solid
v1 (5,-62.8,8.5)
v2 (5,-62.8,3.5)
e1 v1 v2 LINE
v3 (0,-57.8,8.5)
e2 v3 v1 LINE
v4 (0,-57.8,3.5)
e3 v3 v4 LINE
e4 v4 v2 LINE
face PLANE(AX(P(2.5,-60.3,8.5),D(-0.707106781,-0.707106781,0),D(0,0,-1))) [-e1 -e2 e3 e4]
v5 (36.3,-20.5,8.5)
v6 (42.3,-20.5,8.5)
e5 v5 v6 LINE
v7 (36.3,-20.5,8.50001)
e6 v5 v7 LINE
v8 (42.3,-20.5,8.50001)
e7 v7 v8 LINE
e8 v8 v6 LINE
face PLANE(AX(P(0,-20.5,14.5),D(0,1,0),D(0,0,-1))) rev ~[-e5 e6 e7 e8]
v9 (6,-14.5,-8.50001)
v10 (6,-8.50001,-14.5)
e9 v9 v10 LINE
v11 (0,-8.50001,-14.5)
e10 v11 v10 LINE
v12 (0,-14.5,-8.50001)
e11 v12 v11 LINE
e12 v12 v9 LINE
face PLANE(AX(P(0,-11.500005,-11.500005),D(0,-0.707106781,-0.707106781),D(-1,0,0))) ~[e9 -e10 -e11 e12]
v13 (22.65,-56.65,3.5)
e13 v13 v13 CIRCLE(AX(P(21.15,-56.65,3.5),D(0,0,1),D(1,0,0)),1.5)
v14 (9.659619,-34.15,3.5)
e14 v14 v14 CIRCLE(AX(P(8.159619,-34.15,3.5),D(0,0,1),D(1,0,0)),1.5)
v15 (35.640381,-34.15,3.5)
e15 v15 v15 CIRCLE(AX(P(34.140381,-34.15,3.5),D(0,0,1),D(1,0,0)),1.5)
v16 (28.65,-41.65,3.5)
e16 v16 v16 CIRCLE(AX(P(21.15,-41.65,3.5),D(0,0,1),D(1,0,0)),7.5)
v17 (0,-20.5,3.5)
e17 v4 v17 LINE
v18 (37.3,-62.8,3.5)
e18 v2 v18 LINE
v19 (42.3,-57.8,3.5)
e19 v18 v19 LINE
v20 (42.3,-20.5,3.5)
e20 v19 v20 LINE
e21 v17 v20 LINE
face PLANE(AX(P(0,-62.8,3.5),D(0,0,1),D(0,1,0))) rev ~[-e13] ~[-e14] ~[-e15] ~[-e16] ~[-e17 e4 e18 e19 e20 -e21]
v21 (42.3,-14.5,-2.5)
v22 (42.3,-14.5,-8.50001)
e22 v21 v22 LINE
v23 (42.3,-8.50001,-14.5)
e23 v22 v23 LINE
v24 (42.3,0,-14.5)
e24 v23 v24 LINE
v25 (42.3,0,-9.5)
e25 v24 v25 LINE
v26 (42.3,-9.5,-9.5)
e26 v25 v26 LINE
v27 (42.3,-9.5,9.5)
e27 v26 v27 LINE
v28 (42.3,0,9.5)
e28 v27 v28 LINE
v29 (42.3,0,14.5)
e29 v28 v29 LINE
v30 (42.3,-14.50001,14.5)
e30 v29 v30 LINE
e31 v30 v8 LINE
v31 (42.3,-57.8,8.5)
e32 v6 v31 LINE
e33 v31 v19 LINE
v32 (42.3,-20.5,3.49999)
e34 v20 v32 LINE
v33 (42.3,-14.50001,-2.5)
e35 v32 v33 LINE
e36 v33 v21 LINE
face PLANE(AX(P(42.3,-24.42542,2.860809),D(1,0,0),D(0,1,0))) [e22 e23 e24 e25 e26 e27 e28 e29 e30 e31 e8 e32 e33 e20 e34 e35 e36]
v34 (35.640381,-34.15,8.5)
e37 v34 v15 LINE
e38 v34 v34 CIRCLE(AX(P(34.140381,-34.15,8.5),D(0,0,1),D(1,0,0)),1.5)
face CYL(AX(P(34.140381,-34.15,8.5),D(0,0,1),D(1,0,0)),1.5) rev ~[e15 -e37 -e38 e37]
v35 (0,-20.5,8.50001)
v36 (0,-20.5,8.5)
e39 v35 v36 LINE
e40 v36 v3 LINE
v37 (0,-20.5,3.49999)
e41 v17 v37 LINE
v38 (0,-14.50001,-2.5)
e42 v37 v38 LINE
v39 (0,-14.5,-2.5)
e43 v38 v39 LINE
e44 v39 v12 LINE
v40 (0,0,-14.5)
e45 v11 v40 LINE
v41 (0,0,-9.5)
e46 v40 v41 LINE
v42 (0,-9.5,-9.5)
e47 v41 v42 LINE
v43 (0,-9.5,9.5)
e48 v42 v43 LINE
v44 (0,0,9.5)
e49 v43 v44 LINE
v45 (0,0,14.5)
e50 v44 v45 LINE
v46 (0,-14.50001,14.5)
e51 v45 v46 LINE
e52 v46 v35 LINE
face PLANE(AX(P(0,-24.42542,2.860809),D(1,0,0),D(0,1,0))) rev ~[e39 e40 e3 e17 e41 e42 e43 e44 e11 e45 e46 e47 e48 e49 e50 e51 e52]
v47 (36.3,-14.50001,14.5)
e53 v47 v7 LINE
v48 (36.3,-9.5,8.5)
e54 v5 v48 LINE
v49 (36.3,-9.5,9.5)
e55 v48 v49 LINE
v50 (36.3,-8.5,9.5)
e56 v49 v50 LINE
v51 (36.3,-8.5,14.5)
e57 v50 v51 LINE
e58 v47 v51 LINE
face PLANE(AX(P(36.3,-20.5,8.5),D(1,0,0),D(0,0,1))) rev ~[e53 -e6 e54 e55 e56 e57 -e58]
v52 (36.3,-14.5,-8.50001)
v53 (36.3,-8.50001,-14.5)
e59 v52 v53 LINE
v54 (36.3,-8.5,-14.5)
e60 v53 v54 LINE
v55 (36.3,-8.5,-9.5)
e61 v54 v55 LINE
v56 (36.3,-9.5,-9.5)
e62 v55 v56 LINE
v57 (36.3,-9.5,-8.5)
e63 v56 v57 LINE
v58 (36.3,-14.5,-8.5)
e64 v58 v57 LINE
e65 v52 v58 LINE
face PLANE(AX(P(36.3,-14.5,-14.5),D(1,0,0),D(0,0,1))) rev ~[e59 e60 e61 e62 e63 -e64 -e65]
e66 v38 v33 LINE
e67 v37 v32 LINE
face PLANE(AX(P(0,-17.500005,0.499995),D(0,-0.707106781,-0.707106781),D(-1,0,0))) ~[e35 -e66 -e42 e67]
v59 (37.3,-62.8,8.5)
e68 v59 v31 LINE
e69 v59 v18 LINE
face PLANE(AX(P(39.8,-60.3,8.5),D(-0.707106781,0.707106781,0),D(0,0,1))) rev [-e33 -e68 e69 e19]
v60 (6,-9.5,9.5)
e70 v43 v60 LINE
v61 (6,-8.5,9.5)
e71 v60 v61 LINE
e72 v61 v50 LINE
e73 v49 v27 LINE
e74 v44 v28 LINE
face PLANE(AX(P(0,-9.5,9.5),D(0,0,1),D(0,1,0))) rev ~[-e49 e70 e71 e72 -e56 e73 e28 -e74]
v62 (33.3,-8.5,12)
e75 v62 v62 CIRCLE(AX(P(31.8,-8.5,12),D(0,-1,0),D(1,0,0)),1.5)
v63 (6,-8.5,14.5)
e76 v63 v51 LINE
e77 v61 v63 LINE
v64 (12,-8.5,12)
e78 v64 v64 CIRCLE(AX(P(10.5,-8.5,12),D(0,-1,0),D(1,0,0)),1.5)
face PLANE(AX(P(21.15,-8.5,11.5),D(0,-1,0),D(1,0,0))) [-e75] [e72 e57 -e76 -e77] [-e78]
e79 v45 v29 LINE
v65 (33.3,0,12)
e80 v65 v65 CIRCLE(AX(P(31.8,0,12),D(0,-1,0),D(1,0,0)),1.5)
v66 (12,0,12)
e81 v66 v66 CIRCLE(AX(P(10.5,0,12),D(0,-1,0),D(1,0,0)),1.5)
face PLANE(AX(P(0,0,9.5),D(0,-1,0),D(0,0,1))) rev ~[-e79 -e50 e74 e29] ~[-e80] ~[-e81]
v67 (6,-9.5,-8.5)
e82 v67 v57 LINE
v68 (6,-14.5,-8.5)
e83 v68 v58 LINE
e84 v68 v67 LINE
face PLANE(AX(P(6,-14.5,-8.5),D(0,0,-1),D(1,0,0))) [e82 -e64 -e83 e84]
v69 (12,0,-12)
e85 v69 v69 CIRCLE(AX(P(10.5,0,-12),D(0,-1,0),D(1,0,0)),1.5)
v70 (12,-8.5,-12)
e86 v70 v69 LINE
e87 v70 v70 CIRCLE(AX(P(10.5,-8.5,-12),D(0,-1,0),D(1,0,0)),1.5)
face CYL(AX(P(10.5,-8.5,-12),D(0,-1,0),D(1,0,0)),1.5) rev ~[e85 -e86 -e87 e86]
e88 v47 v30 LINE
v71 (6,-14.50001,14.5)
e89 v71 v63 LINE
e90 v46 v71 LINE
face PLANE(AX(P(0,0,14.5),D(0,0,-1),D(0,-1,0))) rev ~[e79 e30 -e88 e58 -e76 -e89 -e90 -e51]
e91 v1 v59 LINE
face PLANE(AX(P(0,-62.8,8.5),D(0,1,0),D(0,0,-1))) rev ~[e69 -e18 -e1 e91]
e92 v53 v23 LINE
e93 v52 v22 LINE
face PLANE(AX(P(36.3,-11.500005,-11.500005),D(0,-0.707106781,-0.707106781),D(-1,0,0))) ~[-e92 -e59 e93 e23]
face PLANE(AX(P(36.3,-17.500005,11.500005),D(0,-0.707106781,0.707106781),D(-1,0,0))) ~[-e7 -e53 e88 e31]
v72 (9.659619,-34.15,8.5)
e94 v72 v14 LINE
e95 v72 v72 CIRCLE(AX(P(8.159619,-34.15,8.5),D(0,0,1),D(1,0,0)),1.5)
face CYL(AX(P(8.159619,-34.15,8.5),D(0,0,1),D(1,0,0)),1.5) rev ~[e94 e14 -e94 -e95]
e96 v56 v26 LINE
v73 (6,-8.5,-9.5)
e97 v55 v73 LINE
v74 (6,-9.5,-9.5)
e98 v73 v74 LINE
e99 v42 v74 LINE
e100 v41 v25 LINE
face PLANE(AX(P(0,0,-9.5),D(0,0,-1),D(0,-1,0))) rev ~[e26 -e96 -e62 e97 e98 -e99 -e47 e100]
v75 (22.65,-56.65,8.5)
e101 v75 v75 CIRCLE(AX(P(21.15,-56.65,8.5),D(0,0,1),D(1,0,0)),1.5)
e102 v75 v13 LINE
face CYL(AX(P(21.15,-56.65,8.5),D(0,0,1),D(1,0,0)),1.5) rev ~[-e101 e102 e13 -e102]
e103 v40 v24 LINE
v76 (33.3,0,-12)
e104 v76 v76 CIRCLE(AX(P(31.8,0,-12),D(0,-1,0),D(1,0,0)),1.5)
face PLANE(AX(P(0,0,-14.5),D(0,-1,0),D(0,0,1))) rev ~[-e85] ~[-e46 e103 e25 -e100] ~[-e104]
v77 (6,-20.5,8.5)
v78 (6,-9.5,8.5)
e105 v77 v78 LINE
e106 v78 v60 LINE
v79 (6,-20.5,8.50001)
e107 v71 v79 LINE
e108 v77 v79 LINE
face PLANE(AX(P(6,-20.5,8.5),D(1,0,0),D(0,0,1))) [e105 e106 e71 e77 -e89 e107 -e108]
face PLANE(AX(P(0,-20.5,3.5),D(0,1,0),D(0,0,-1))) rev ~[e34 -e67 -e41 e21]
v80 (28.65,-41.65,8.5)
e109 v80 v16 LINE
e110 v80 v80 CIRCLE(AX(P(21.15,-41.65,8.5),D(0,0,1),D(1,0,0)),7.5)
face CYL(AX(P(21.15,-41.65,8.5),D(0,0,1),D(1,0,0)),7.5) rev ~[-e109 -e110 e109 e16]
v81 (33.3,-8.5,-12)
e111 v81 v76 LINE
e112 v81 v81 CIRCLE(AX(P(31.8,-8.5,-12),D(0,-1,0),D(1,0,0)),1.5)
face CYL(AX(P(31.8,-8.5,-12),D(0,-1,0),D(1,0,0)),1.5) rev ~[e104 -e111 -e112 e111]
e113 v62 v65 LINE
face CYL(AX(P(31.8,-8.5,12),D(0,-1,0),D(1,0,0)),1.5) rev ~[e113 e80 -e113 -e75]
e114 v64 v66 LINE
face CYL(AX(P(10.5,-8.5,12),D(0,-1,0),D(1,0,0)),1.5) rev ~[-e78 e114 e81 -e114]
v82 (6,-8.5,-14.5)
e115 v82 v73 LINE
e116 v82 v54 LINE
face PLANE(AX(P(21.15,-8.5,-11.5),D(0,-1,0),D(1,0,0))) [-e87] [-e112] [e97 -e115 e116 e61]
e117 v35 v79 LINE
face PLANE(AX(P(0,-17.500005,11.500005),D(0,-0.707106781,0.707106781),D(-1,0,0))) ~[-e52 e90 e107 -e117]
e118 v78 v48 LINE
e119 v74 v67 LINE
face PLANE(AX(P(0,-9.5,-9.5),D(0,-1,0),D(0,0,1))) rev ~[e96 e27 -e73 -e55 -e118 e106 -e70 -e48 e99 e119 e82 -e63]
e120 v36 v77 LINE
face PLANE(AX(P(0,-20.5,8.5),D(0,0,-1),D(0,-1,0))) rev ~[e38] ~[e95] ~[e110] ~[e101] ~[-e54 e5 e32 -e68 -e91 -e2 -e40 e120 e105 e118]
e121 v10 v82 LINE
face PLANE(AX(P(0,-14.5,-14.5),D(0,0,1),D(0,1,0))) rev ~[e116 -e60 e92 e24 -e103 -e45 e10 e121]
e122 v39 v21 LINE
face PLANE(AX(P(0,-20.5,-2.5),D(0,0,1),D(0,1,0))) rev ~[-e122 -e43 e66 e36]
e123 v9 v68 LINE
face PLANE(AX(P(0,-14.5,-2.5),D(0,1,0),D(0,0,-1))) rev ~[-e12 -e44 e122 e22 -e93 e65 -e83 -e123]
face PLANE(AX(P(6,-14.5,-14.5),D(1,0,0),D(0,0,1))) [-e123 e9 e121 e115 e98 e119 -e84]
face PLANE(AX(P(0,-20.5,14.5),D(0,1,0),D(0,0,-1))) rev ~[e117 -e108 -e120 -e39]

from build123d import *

# Parameters (mm, degrees)
F1_DEPTH  = 42.3
F3_W      = 30.3
F3_H      = 6
F4_DEPTH  = 6
F2_W      = 30.3
F2_H      = 6
F5_DEPTH  = 12
F6_SIZE   = 5.99999
F7_R      = 1.5
F8_DEPTH  = 8.501
F9_R      = 1.5
F10_DEPTH = 8.501
F11_R     = 1.5
F11_R_2   = 7.5
F12_DEPTH = 5
F13_SIZE  = 5


# Not quite as in the source:
# - a fillet or chamfer is up to 0.001 mm smaller than in the source, because OpenCascade refuses the exact size
# - a feature names something its author has since deleted; it is built from what else it names


with BuildPart() as f1:
    # F0 (on Right) → F1 (new body)
    with BuildSketch(Plane.YZ):
        Polygon((-9.5, 9.5), (0, 9.5), (0, 14.5), (-14.5, 14.5), (-20.5, 14.5), (-20.5, 8.5), (-62.8, 8.5), (-62.8, 3.5), (-20.5, 3.5), (-20.5, -2.5), (-14.5, -2.5), (-14.5, -14.5), (0, -14.5), (0, -9.5), (-9.5, -9.5), align=None)
    extrude(amount=F1_DEPTH)

    # F3 (on face) → F4 (cut)
    with BuildSketch(Plane.XZ.offset(14.5)):
        with Locations((21.15, -11.5)):
            Rectangle(F3_W, F3_H)
    extrude(amount=-F4_DEPTH, mode=Mode.SUBTRACT)

    # F2 (on face) → F5 (cut)
    with BuildSketch(Plane.XZ.offset(20.5)):
        with Locations((21.15, 11.5)):
            Rectangle(F2_W, F2_H)
    extrude(amount=-F5_DEPTH, mode=Mode.SUBTRACT)

    # F6 (size 6 in the source; OpenCascade refuses exactly that, so slightly less here)
    f6_edges = [f1.edges().sort_by_distance(p)[0] for p in [
        (3, -14.5, -14.5),
        (39.3, -14.5, -14.5),
        (3, -20.5, 14.5),
        (39.3, -20.5, 14.5),
        (21.15, -20.5, -2.5),
    ]]
    chamfer(f6_edges, length=F6_SIZE)

    # F7 (on face) → F8 (cut, through all)
    with BuildSketch(Plane.XZ.offset(8.5)):
        with Locations((10.5, 12)):
            Circle(F7_R)
        with Locations((31.8, 12)):
            Circle(F7_R)
    extrude(amount=-F8_DEPTH, mode=Mode.SUBTRACT)

    # F9 (on face) → F10 (cut, through all)
    with BuildSketch(Plane.XZ.offset(8.5)):
        with Locations((10.5, -12)):
            Circle(F9_R)
        with Locations((31.8, -12)):
            Circle(F9_R)
    extrude(amount=-F10_DEPTH, mode=Mode.SUBTRACT)

    # F11 (on face) → F12 (cut, through all)
    with BuildSketch(Plane.XY.offset(8.5)):
        with Locations((8.1596189432, -34.15)):
            Circle(F11_R)
        with Locations((21.15, -41.65)):
            Circle(F11_R_2)
        with Locations((34.1403810568, -34.15)):
            Circle(F11_R)
        with Locations((21.15, -56.65)):
            Circle(F11_R)
    extrude(amount=-F12_DEPTH, mode=Mode.SUBTRACT)

    # F13
    f13_edges = [f1.edges().sort_by_distance(p)[0] for p in [
        (42.3, -62.8, 6),
        (0, -62.8, 6),
    ]]
    chamfer(f13_edges, length=F13_SIZE)


solid = f1.part
